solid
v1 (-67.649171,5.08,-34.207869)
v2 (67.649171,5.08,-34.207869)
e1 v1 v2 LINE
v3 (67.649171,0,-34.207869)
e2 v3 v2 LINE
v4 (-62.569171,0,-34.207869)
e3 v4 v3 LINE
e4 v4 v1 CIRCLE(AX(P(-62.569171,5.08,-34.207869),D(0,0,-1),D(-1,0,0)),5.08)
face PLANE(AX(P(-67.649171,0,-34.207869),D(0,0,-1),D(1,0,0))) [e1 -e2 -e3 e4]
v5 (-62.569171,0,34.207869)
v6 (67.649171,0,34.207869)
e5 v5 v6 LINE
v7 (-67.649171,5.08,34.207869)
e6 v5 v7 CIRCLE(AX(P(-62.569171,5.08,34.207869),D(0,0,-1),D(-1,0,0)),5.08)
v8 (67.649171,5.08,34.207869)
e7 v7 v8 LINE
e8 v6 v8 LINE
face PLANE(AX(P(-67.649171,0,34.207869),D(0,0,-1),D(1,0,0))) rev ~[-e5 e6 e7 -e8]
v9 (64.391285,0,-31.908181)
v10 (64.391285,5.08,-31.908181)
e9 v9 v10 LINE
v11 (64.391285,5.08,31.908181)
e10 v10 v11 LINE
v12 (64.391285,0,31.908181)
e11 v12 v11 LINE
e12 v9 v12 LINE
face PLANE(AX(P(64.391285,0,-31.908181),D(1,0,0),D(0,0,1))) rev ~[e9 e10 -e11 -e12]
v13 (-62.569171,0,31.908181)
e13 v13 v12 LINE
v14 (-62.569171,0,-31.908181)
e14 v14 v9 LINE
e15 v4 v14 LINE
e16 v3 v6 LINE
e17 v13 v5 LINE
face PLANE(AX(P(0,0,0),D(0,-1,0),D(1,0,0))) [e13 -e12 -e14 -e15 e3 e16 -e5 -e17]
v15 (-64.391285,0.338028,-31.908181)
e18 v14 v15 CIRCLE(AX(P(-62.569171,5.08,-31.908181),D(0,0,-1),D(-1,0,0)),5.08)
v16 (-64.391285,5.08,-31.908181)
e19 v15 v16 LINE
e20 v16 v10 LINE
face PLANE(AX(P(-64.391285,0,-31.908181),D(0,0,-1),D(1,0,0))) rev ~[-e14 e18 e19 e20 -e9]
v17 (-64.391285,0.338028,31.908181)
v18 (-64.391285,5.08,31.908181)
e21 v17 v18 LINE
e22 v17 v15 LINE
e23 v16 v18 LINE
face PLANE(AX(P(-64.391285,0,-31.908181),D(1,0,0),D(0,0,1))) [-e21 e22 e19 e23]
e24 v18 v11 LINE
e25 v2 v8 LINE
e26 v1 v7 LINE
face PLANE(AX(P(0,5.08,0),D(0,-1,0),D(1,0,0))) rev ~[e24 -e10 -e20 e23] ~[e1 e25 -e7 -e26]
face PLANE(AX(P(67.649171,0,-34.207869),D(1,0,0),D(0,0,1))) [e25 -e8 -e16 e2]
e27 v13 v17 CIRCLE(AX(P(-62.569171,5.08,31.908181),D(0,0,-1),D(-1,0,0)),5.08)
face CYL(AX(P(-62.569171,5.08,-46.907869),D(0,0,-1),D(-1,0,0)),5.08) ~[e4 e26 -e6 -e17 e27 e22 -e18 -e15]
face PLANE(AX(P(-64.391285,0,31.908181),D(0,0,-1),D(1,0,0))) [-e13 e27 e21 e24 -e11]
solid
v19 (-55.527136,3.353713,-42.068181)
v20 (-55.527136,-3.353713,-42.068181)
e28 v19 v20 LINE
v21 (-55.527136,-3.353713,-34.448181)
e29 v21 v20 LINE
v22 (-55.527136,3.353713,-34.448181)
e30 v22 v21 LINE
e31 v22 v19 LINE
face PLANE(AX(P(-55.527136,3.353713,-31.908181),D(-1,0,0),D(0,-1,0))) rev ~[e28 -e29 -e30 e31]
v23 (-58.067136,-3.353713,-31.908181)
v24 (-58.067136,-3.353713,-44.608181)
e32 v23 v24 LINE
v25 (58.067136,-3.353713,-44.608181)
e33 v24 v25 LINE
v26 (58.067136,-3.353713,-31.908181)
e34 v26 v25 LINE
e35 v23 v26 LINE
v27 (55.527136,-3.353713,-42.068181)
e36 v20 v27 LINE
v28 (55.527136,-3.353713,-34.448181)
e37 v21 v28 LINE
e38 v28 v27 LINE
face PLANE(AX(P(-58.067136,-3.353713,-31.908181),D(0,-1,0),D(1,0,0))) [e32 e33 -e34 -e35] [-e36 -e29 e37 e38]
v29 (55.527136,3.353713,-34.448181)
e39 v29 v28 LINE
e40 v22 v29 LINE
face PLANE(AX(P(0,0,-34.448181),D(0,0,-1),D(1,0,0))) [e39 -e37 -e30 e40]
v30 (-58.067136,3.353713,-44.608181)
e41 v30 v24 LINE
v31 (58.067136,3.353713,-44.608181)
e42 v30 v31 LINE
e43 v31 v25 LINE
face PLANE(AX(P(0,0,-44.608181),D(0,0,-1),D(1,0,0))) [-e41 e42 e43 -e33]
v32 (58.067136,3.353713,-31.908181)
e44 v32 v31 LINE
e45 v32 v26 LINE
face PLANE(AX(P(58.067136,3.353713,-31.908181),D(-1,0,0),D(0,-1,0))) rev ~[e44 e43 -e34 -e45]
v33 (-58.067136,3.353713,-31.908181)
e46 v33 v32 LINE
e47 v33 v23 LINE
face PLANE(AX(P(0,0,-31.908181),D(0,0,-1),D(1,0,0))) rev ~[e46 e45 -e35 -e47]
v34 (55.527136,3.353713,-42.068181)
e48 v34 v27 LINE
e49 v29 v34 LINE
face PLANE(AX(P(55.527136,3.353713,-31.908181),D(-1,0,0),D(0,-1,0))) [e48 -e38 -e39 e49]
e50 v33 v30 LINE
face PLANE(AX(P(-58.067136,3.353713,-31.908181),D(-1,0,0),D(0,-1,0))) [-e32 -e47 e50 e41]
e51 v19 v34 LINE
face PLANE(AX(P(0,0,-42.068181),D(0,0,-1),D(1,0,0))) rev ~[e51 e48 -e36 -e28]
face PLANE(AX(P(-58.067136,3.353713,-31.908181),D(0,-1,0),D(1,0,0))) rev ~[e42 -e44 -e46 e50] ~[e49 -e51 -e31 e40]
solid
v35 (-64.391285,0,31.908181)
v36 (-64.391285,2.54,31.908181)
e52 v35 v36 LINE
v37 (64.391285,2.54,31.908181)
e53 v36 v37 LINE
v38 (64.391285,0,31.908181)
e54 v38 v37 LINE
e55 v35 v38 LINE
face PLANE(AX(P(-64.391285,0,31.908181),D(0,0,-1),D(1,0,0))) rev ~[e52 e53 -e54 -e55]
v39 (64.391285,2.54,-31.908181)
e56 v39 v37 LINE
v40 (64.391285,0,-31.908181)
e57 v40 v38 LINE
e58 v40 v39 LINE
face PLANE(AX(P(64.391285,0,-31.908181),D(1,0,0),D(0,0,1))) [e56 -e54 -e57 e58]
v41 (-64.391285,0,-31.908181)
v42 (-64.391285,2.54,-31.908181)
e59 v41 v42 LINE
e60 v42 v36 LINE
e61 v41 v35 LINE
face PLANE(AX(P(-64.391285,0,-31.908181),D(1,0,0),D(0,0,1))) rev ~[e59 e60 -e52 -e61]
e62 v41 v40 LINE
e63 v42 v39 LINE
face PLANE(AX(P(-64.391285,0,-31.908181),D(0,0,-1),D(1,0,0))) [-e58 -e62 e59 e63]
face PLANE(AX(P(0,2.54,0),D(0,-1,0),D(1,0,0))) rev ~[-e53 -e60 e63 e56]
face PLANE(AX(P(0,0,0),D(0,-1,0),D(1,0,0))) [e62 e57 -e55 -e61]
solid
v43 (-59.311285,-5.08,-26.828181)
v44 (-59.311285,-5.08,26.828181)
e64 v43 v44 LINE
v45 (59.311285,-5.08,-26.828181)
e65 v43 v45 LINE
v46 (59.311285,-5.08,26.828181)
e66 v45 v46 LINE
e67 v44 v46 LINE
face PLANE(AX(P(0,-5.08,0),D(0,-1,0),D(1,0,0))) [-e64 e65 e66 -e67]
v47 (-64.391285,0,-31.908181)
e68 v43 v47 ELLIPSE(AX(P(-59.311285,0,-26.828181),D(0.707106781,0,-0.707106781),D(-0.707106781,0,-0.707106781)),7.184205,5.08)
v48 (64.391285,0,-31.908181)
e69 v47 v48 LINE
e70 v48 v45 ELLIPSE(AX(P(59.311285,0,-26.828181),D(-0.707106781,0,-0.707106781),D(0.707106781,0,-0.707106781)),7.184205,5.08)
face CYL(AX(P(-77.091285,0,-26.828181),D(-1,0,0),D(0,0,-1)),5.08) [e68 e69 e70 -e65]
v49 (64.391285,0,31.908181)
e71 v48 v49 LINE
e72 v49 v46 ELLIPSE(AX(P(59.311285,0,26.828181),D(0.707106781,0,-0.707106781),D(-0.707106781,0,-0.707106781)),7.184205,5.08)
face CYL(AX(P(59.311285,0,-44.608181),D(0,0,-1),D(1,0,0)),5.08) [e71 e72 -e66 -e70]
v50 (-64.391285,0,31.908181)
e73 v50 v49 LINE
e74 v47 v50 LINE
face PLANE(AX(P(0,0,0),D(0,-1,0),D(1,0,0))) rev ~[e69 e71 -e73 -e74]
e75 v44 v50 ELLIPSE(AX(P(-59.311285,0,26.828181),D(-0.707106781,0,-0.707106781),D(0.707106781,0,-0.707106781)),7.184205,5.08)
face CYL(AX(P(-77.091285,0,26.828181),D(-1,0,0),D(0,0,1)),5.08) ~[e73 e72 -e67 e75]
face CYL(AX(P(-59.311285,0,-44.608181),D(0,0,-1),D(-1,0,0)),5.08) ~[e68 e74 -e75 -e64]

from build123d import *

# Parameters (mm, degrees)
F0_W          = 128.7825703621
F0_H          = 63.8163611293
F1_DEPTH      = 5.08
F0_W_2        = 135.2983415127
F0_H_2        = 68.4157386422
F2_DEPTH      = 5.08
F3_W          = 116.1342710257
F3_H          = 6.7074256949
F4_DEPTH      = 12.7
F5_T          = -2.54
F6_T1_DEPTH   = 89.2163611293
F6_T3_DEPTH   = 154.1825703621
F6_2_T1_DEPTH = 93.8157386422
F7_DEPTH      = 2.54


# Not quite as in the source:
# - a fillet or chamfer that OpenCascade refuses, or shapes differently, is made with other operations: its cross-section is extruded or revolved along the edge and cut away or added


with BuildPart() as f1:
    # F0 (on Front) → F1 (new body)
    with BuildSketch(Plane.XZ):
        Rectangle(F0_W, F0_H)
    extrude(amount=F1_DEPTH)

    # F6: fillet of radius 5.08 on 4 edges, made by hand

    # F6_s2 → F6_t1 (cut)
    with BuildSketch(Plane.XY.offset(-44.6081805646)):
        with BuildLine():
            ThreePointArc((64.391285181, 0), (62.9033876295, -3.5921024484), (59.311285181, -5.08))
            Line((59.311285181, -5.08), (64.391285181, -5.08))
            Line((64.391285181, -5.08), (64.391285181, 0))
        make_face()
        with BuildLine():
            ThreePointArc((-64.391285181, 0), (-62.9033876295, -3.5921024484), (-59.311285181, -5.08))
            Line((-59.311285181, -5.08), (-64.391285181, -5.08))
            Line((-64.391285181, -5.08), (-64.391285181, 0))
        make_face()
    extrude(amount=F6_T1_DEPTH, mode=Mode.SUBTRACT)

    # F6_s4 → F6_t3 (cut)
    with BuildSketch(Plane.YZ.offset(-77.091285181)):
        with BuildLine():
            ThreePointArc((0, 31.9081805646), (-3.5921024484, 30.4202830131), (-5.08, 26.8281805646))
            Line((-5.08, 26.8281805646), (-5.08, 31.9081805646))
            Line((-5.08, 31.9081805646), (0, 31.9081805646))
        make_face()
        with BuildLine():
            ThreePointArc((0, -31.9081805646), (-3.5921024484, -30.4202830131), (-5.08, -26.8281805646))
            Line((-5.08, -26.8281805646), (-5.08, -31.9081805646))
            Line((-5.08, -31.9081805646), (0, -31.9081805646))
        make_face()
    extrude(amount=F6_T3_DEPTH, mode=Mode.SUBTRACT)


with BuildPart() as f2:
    # F0 (on Front) → F2 (new body)
    with BuildSketch(Plane.XZ):
        Rectangle(F0_W_2, F0_H_2)
        Rectangle(F0_W, F0_H, mode=Mode.SUBTRACT)
    extrude(amount=-F2_DEPTH)

    # F6#2: fillet of radius 5.08 on 1 edges, made by hand

    # F6_2_s2 → F6_2_t1 (cut)
    with BuildSketch(Plane.XY.offset(-46.9078693211)):
        with BuildLine():
            ThreePointArc((-67.6491707563, 5.08), (-66.1612732048, 1.4878975516), (-62.5691707563, 0))
            Line((-62.5691707563, 0), (-67.6491707563, 0))
            Line((-67.6491707563, 0), (-67.6491707563, 5.08))
        make_face()
    extrude(amount=F6_2_T1_DEPTH, mode=Mode.SUBTRACT)


with BuildPart() as f4:
    # F3 (on face) → F4 (new body)
    with BuildSketch(Plane(origin=(0, 0, -31.9081805646), x_dir=(1, 0, 0), z_dir=(0, 0, -1))):
        Rectangle(F3_W, F3_H)
    extrude(amount=F4_DEPTH)

    # F5
    f5_openings = [f4.faces().sort_by_distance(p)[0] for p in [
        (0, 3.353713, -38.258181),
        (0, -3.353713, -38.258181),
    ]]
    offset(amount=F5_T, openings=f5_openings)


with BuildPart() as f7:
    # F7 (new): a face of the model
    f7_faces = [f1.part.faces().sort_by_distance(p)[0] for p in [
        (0, 0, 0),
    ]]
    extrude(f7_faces, amount=F7_DEPTH)


solid = Compound([f1.part, f2.part, f4.part, f7.part])
